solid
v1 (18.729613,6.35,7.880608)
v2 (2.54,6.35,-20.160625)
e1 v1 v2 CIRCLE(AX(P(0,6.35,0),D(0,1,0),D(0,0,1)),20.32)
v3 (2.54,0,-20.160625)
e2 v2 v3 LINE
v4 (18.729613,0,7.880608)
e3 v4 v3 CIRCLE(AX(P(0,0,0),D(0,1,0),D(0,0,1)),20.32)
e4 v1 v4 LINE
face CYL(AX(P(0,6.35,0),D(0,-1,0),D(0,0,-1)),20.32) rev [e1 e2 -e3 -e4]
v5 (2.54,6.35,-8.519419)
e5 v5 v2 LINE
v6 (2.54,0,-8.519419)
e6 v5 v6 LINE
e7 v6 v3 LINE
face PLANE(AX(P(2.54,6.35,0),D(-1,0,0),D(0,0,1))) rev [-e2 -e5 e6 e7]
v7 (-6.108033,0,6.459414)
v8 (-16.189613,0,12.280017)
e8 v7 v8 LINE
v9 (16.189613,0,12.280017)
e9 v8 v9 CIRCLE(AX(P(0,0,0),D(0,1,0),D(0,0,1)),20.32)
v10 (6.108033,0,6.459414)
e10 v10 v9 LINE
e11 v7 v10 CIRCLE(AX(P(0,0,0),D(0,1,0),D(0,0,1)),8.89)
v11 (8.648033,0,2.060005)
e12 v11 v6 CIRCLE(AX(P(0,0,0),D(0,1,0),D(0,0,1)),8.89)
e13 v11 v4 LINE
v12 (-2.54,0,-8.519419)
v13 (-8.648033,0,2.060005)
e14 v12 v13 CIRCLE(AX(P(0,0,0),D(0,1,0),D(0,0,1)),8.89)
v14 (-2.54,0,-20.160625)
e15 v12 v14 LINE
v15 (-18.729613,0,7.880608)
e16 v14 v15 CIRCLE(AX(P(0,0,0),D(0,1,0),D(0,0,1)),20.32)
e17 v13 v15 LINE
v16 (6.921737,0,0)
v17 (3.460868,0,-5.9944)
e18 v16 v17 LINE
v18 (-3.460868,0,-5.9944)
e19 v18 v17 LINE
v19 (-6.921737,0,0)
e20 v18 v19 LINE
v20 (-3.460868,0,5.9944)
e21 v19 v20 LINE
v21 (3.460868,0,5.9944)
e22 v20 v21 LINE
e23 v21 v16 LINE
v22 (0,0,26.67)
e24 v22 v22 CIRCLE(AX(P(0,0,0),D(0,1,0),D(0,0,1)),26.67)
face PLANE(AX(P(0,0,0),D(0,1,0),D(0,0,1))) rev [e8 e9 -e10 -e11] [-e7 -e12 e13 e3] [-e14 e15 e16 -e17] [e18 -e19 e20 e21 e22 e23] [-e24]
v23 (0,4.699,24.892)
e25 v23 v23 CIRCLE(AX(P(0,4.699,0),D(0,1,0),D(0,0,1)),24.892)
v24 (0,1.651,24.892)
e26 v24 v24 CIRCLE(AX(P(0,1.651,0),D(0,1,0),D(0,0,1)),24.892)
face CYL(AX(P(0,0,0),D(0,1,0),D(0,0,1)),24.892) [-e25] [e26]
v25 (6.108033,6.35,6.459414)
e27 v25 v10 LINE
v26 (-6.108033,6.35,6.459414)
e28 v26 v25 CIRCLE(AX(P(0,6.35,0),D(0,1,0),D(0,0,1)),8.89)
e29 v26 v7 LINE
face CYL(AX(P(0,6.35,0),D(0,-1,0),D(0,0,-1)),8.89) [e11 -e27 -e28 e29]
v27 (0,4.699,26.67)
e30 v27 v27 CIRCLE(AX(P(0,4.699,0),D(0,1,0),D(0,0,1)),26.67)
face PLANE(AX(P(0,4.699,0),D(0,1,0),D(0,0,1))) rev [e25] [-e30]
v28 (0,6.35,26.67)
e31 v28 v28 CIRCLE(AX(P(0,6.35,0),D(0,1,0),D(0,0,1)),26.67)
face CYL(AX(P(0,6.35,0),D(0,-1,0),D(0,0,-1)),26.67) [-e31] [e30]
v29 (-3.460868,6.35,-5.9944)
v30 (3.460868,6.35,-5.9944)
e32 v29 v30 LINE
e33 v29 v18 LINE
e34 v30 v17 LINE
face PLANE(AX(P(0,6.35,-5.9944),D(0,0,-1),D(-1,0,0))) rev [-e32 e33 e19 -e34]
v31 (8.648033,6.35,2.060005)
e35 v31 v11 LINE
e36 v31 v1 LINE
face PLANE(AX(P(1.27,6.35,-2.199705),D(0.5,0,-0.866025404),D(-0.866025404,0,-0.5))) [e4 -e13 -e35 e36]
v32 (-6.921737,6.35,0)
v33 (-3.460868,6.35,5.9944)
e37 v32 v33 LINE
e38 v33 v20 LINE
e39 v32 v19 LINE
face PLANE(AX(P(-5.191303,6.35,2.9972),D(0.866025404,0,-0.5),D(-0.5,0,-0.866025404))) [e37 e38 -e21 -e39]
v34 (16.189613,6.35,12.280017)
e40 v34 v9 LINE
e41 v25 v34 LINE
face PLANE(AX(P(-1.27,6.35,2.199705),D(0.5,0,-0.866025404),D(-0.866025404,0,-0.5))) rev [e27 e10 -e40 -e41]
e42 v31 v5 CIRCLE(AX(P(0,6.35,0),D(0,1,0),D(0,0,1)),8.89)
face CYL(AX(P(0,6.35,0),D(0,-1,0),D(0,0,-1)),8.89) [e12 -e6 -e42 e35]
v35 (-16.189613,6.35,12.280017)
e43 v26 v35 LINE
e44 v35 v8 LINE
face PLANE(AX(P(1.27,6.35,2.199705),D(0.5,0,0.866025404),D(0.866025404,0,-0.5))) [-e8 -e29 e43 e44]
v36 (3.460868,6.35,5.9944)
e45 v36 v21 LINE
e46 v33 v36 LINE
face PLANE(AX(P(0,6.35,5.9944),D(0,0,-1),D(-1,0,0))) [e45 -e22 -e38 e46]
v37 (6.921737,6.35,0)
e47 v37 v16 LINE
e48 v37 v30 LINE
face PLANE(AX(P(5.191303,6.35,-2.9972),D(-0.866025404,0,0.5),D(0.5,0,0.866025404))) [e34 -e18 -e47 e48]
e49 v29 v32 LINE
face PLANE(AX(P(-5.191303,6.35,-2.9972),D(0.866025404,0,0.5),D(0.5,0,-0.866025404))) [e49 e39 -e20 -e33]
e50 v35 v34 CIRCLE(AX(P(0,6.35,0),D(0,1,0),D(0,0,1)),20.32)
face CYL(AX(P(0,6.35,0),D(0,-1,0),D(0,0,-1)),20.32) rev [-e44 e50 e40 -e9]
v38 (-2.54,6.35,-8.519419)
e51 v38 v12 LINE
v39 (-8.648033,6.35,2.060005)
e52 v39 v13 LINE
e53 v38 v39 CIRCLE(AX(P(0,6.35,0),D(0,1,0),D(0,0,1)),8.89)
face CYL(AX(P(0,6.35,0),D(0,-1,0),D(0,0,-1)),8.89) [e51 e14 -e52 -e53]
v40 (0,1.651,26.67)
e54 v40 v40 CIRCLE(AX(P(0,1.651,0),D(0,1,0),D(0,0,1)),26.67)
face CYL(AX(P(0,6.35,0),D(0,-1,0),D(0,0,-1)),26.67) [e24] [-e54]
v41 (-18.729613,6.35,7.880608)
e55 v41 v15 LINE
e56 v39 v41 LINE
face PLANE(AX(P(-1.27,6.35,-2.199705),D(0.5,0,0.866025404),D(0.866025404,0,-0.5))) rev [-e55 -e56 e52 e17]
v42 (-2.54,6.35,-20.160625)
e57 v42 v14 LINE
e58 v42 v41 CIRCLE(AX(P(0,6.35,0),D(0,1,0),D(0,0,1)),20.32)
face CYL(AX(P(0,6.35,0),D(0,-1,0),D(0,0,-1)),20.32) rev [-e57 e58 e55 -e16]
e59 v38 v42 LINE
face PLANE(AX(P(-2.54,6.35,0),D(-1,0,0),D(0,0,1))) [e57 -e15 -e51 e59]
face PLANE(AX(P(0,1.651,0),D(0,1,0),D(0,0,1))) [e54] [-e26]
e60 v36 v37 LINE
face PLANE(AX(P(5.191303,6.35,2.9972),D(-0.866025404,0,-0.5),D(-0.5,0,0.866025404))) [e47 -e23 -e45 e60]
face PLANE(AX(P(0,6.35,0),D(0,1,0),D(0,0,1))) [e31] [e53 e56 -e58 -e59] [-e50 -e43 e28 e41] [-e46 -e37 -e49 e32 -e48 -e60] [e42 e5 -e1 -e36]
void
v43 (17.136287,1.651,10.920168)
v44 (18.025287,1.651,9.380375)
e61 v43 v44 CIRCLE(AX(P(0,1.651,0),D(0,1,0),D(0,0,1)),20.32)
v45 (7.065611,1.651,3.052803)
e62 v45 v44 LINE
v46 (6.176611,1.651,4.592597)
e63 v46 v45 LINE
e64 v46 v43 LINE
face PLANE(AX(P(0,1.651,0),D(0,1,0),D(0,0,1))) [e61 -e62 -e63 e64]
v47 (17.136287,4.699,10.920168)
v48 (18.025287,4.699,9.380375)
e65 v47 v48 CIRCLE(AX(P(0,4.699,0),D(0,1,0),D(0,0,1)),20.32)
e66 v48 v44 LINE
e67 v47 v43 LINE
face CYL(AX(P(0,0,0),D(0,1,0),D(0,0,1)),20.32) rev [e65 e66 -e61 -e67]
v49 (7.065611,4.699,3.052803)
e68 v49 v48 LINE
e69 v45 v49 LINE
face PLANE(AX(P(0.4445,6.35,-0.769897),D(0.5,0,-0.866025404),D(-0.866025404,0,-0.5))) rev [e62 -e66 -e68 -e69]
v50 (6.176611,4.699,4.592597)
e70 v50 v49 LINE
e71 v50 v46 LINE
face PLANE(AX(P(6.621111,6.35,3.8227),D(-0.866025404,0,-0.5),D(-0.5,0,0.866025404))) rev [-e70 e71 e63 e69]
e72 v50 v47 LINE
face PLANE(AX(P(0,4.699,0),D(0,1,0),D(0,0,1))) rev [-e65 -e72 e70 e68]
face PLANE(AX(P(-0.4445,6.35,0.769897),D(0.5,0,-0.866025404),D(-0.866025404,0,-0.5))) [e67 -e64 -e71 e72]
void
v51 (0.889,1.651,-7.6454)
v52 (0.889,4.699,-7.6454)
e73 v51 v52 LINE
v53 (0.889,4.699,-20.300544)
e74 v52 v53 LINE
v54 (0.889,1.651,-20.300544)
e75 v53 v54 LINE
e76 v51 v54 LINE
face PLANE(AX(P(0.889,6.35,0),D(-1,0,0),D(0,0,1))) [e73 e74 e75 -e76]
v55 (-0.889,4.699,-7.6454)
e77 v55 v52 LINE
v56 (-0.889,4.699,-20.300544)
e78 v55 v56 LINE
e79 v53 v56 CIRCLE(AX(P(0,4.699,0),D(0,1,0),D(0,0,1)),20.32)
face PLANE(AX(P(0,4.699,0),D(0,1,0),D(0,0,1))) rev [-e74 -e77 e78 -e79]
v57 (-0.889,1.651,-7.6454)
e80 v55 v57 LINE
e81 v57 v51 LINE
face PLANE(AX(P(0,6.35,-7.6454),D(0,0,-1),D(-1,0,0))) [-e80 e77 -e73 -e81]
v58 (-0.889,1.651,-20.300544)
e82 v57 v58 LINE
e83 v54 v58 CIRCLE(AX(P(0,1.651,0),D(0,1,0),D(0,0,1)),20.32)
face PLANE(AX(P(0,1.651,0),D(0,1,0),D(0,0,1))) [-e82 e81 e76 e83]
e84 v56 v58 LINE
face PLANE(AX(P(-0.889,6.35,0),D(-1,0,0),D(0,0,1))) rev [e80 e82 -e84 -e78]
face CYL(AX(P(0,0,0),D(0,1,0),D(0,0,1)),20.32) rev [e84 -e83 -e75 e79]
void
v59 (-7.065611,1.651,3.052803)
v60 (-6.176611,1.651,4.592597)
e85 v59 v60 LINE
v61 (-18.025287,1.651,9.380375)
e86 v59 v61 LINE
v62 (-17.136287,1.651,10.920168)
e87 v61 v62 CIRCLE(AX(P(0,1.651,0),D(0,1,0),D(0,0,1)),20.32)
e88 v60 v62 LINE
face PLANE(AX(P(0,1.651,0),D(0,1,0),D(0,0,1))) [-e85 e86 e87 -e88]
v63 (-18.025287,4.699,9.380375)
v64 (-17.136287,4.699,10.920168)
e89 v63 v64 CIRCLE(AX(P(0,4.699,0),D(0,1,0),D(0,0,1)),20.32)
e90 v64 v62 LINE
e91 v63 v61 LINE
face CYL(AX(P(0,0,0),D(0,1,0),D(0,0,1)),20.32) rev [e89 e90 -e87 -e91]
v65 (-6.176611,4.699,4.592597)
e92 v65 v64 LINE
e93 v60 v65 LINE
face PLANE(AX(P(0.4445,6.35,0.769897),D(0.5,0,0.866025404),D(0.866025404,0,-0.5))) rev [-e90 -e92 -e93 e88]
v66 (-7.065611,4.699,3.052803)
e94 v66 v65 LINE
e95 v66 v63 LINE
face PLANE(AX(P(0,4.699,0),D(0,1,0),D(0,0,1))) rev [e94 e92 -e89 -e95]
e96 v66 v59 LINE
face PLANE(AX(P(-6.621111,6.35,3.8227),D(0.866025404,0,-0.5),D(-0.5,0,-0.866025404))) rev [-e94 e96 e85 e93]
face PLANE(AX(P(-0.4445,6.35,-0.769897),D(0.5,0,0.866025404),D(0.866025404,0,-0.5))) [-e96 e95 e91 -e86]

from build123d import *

# Parameters (mm, degrees)
SKETCH1_R           = 26.67
BOSS_EXTRUDE1_DEPTH = 6.35
SHELL3_START        = 1.651
SHELL3_OUTLINE_R    = 26.67
SHELL3_DEPTH        = 3.048
BOSS_EXTRUDE3_START = -6.35
SKETCH7_R           = 24.892
SKETCH7_R_2         = 20.32
BOSS_EXTRUDE3_DEPTH = 6.35


# Read off the part's stored shape, not the designer's step: Shell3
with BuildPart() as part:
    # Sketch1 → Boss-Extrude1 (new body)
    with BuildSketch(Plane(origin=(0, 0, 0), x_dir=(1, 0, 0), z_dir=(0, 1, 0))):
        with Locations(Location((0, 0, 0), (0, 0, 270))):
            Circle(SKETCH1_R)
        Polygon((-5.19130268, 2.9972), (-6.921736907, 0), (-5.19130268, -2.9972), (-3.460868454, -5.9944), (3.460868454, -5.9944), (5.19130268, -2.9972), (6.921736907, 0), (5.19130268, 2.9972), (3.460868454, 5.9944), (-3.460868454, 5.9944), align=None, mode=Mode.SUBTRACT)
        with BuildLine():
            Line((-6.108033275, -6.459414023), (-16.189613398, -12.280017021))
            ThreePointArc((-16.189613398, -12.280017021), (0, -20.32), (16.189613398, -12.280017021))
            Line((16.189613398, -12.280017021), (6.108033275, -6.459414023))
            ThreePointArc((6.108033275, -6.459414023), (0, -8.89), (-6.108033275, -6.459414023))
        make_face(mode=Mode.SUBTRACT)
        with BuildLine():
            Line((-2.54, 8.519418994), (-2.54, 20.16062499))
            ThreePointArc((-2.54, 20.16062499), (-17.597636205, 10.16), (-18.729613398, -7.88060797))
            Line((-18.729613398, -7.88060797), (-8.648033275, -2.060004972))
            ThreePointArc((-8.648033275, -2.060004972), (-7.69896584, 4.445), (-2.54, 8.519418994))
        make_face(mode=Mode.SUBTRACT)
        with BuildLine():
            Line((8.648033275, -2.060004972), (18.729613398, -7.88060797))
            ThreePointArc((18.729613398, -7.88060797), (17.597636205, 10.16), (2.54, 20.16062499))
            Line((2.54, 20.16062499), (2.54, 8.519418994))
            ThreePointArc((2.54, 8.519418994), (7.69896584, 4.445), (8.648033275, -2.060004972))
        make_face(mode=Mode.SUBTRACT)
    extrude(amount=BOSS_EXTRUDE1_DEPTH)

    # Shell3 outline → Shell3 (cut)
    with BuildSketch(Plane(origin=(0, 0, 0), x_dir=(1, 0, 0), z_dir=(0, 1, 0)).offset(SHELL3_START)):
        Circle(SHELL3_OUTLINE_R)
        with BuildLine():
            ThreePointArc((0.889, 21.953007083), (19.027444147, 10.9855), (19.456361824, -10.206606958))
            Line((19.456361824, -10.206606958), (7.065610622, -3.052803416))
            Line((7.065610622, -3.052803416), (6.176610622, -4.592596584))
            Line((6.176610622, -4.592596584), (18.567361824, -11.746400126))
            ThreePointArc((18.567361824, -11.746400126), (0, -21.971), (-18.567361824, -11.746400126))
            Line((-18.567361824, -11.746400126), (-6.176610622, -4.592596584))
            Line((-6.176610622, -4.592596584), (-7.065610622, -3.052803416))
            Line((-7.065610622, -3.052803416), (-19.456361824, -10.206606958))
            ThreePointArc((-19.456361824, -10.206606958), (-19.027444147, 10.9855), (-0.889, 21.953007083))
            Line((-0.889, 21.953007083), (-0.889, 7.6454))
            Line((-0.889, 7.6454), (0.889, 7.6454))
            Line((0.889, 7.6454), (0.889, 21.953007083))
        make_face(mode=Mode.SUBTRACT)
    extrude(amount=SHELL3_DEPTH, mode=Mode.SUBTRACT)

    # Sketch7 → Boss-Extrude3 (add)
    with BuildSketch(Plane(origin=(0, 6.35, 0), x_dir=(1, 0, 0), z_dir=(0, 1, 0)).offset(BOSS_EXTRUDE3_START)):
        with Locations(Location((0, 0, 0), (0, 0, 270))):
            Circle(SKETCH7_R)
        Circle(SKETCH7_R_2, mode=Mode.SUBTRACT)
    extrude(amount=BOSS_EXTRUDE3_DEPTH)


solid = part.part
